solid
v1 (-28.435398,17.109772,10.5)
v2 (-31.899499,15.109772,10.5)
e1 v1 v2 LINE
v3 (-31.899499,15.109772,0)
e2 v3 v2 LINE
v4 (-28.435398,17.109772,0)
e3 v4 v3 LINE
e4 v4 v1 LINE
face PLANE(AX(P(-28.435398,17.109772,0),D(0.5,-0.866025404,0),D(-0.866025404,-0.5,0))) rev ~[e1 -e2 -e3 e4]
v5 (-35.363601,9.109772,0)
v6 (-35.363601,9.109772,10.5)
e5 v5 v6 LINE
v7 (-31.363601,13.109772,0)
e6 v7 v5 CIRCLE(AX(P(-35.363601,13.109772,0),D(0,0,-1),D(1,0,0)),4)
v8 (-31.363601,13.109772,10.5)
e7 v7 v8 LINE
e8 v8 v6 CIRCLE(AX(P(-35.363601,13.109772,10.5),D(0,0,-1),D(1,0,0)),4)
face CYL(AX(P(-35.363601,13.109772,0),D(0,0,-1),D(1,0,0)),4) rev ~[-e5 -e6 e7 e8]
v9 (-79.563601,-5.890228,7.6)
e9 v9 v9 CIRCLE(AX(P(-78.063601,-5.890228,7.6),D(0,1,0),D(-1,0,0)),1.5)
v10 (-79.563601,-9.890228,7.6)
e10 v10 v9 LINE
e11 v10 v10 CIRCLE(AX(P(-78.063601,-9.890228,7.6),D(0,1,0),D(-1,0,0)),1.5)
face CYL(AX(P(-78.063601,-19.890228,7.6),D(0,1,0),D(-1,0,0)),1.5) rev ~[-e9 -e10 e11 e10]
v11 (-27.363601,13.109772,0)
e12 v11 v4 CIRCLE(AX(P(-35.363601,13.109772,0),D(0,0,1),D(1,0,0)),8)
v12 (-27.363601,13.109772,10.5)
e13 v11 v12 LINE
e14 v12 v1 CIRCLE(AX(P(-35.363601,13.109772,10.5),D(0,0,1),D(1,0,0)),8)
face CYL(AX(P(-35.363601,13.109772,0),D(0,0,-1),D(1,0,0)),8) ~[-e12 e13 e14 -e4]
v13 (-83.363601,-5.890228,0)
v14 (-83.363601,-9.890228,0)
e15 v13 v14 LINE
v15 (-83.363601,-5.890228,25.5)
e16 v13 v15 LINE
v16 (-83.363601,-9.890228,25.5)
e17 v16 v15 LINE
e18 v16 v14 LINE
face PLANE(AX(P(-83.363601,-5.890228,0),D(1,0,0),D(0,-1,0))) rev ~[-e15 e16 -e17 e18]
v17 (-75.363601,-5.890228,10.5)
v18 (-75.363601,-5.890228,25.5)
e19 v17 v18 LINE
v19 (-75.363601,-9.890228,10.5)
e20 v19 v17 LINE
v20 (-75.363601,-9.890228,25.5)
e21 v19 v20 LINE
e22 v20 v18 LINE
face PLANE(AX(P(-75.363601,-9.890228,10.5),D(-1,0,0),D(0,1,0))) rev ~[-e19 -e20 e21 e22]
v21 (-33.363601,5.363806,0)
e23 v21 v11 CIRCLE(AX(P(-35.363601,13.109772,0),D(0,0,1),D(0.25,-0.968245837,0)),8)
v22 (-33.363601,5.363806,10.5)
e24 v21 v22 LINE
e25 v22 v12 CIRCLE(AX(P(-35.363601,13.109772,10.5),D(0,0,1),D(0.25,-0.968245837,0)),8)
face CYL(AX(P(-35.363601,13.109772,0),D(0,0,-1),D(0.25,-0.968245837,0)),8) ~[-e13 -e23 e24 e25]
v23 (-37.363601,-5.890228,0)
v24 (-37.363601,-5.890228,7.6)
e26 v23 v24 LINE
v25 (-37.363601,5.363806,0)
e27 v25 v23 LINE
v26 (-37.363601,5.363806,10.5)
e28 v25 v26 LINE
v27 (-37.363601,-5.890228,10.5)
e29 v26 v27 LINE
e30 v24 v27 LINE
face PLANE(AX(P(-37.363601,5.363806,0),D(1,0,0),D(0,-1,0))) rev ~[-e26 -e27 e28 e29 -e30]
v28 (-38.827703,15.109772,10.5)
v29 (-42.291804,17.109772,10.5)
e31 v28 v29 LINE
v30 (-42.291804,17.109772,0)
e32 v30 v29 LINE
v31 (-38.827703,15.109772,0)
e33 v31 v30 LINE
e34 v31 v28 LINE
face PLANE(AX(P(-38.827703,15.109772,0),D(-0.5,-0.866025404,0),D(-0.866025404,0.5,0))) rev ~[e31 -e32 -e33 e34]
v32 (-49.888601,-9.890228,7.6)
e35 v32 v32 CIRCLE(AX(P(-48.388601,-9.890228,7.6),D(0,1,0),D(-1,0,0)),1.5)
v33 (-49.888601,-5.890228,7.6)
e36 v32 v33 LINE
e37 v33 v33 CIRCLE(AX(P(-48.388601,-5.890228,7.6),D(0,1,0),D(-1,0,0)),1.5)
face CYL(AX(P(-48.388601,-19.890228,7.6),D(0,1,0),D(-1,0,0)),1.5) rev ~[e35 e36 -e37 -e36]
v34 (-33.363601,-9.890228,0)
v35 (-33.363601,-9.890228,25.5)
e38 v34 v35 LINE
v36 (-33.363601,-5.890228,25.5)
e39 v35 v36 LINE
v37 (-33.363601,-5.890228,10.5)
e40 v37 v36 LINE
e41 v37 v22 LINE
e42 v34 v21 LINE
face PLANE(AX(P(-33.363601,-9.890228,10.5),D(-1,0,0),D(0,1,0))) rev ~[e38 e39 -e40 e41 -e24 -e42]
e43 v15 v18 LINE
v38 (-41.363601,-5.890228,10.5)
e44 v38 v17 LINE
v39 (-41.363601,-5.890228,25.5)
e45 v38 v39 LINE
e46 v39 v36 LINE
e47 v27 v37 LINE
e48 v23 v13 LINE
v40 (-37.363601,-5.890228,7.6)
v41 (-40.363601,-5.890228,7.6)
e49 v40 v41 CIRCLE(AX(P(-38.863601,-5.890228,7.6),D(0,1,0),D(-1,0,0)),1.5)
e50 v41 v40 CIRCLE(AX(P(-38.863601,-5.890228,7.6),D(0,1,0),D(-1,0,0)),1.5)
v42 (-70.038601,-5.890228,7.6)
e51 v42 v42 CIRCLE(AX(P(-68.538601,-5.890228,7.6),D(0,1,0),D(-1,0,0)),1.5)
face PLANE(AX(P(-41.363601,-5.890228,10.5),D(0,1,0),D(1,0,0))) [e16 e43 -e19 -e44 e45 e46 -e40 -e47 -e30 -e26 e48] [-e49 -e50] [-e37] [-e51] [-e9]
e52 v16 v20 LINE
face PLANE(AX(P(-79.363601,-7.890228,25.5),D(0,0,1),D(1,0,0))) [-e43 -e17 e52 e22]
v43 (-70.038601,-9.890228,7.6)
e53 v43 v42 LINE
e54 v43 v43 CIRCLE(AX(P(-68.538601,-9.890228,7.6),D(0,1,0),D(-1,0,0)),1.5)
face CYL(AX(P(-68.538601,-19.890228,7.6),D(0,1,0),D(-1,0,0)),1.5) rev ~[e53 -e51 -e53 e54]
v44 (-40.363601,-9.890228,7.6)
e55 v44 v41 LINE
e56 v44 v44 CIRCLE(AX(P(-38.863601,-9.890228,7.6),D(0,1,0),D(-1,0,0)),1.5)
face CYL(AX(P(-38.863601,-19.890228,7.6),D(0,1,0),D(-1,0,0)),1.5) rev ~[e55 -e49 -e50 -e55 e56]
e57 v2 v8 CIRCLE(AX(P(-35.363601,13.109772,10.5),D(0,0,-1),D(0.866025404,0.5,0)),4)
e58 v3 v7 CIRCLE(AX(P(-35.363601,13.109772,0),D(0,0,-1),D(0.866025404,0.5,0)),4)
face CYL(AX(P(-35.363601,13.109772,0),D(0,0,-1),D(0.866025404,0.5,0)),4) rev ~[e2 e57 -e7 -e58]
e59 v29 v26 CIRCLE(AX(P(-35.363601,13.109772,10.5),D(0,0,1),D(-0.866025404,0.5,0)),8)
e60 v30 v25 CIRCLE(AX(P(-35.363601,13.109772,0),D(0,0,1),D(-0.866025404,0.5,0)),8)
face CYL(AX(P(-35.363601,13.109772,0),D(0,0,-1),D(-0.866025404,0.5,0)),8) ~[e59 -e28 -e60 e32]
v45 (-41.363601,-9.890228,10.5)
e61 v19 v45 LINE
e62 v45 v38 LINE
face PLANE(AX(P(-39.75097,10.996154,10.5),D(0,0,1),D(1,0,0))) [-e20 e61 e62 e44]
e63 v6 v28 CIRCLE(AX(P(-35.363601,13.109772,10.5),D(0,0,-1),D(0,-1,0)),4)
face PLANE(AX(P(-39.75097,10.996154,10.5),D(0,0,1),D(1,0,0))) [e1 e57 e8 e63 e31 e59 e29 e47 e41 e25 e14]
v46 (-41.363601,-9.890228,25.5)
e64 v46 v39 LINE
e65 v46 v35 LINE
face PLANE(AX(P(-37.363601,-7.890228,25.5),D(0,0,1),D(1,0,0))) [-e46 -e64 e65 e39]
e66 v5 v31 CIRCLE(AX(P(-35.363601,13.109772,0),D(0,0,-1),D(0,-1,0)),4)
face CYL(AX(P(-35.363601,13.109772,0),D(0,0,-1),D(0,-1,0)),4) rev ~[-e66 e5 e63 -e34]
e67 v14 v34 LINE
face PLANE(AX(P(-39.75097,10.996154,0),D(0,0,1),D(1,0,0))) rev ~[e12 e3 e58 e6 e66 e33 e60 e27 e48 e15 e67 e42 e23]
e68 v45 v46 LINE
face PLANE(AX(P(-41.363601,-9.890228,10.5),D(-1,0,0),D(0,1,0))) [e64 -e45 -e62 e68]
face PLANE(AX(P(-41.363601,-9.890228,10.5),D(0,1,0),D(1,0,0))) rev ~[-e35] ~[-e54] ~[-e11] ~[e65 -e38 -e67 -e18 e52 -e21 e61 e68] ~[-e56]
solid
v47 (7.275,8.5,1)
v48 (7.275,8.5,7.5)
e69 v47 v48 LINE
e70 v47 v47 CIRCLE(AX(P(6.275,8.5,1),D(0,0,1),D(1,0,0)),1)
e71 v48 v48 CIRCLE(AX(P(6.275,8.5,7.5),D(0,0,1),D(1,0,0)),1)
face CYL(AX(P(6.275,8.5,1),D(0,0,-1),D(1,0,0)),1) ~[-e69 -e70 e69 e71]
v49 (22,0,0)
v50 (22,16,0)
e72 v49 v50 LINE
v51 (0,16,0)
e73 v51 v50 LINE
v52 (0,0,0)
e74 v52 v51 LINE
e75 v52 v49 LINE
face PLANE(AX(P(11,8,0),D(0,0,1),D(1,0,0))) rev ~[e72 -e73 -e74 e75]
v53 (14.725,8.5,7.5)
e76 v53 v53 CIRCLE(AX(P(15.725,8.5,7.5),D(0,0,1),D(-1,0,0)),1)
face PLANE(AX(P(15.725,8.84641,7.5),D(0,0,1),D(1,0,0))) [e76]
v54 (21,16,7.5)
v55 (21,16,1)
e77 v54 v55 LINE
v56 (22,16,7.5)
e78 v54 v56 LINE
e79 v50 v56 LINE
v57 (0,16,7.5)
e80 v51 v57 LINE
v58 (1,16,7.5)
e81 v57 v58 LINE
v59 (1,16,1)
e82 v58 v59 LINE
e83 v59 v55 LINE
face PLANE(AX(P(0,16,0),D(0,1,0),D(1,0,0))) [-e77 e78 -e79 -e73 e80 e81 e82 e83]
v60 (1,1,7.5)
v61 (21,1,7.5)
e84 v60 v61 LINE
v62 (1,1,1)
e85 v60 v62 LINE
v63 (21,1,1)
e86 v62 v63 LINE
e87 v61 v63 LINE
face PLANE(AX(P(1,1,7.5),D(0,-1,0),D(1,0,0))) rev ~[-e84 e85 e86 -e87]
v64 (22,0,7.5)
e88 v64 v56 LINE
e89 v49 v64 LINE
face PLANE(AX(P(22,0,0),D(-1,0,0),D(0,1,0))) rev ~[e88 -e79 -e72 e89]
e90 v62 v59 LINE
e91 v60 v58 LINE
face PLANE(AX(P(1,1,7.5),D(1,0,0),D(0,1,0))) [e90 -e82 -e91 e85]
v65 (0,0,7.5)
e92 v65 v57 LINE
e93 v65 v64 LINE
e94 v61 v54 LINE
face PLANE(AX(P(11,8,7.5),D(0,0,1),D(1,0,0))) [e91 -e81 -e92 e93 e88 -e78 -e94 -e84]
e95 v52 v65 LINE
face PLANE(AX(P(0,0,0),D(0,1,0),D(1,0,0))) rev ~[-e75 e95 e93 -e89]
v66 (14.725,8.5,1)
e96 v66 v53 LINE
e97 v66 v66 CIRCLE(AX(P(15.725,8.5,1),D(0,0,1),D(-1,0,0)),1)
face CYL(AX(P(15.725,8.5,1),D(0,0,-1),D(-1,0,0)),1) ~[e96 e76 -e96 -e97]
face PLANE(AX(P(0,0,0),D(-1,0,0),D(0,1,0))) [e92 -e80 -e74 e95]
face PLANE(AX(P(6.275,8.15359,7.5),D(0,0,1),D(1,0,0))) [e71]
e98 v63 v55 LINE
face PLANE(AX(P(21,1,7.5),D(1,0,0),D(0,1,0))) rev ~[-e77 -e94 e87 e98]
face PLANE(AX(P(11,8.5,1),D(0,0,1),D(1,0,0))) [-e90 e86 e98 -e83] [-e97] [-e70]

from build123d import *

# Parameters (mm, degrees)
F0_W      = 22
F0_H      = 16
F1_DEPTH  = 7.5
F2_W      = 20
F2_H      = 15
F3_DEPTH  = 6.5
F5_DEPTH  = 6.5
F7_DEPTH  = 10.5
F9_W      = 8
F9_H      = 4
F10_DEPTH = 15
F12_D     = 3
F12_DEPTH = 10
F12_TIP   = 0.9012909285


# Not quite as in the source:
# - a feature names something its author has since deleted; it is built from what else it names


with BuildPart() as f1:
    # F0 (on Top) → F1 (new body)
    with BuildSketch(Plane.XY):
        with Locations((11, 8)):
            Rectangle(F0_W, F0_H)
    extrude(amount=F1_DEPTH)

    # F2 (on face) → F3 (cut)
    with BuildSketch(Plane.XY.offset(7.5)):
        with Locations((11, 8.5)):
            Rectangle(F2_W, F2_H)
    extrude(amount=-F3_DEPTH, mode=Mode.SUBTRACT)

    # F4 (on face) → F5 (join)
    with BuildSketch(Plane.XY.offset(1)):
        with BuildLine():
            ThreePointArc((5.275, 8.5), (6.275, 7.5), (7.275, 8.5))
            Line((7.275, 8.5), (5.275, 8.5))
        make_face()
        with BuildLine():
            Line((5.275, 8.5), (7.275, 8.5))
            ThreePointArc((7.275, 8.5), (6.275, 9.5), (5.275, 8.5))
        make_face()
        with BuildLine():
            ThreePointArc((16.725, 8.5), (15.725, 9.5), (14.725, 8.5))
            Line((14.725, 8.5), (16.725, 8.5))
        make_face()
        with BuildLine():
            Line((16.725, 8.5), (14.725, 8.5))
            ThreePointArc((14.725, 8.5), (15.725, 7.5), (16.725, 8.5))
        make_face()
    extrude(amount=F5_DEPTH)


with BuildPart() as f7:
    # F6 (on Top) → F7 (new body)
    with BuildSketch(Plane.XY):
        with BuildLine():
            Line((0.0722974215, 15.1097724214), (-3.3918041936, 17.1097724214))
            ThreePointArc((-3.3918041936, 17.1097724214), (-3.8406014795, 10.0146369826), (1.5363990366, 5.363805729))
            Line((1.5363990366, 5.363805729), (1.5363990366, 9.1097724214))
            Line((1.5363990366, 9.1097724214), (3.5363990366, 9.1097724214))
            ThreePointArc((3.5363990366, 9.1097724214), (0.0722974215, 11.1097724214), (0.0722974215, 15.1097724214))
        make_face()
        with BuildLine():
            ThreePointArc((3.5363990366, 5.1097724214), (4.5444333765, 5.1735348513), (5.5363990366, 5.363805729))
            Line((5.5363990366, 5.363805729), (5.5363990366, 9.1097724214))
            Line((5.5363990366, 9.1097724214), (3.5363990366, 9.1097724214))
            Line((3.5363990366, 9.1097724214), (3.5363990366, 5.1097724214))
        make_face()
        with BuildLine():
            ThreePointArc((1.5363990366, 5.363805729), (2.5283646968, 5.1735348513), (3.5363990366, 5.1097724214))
            Line((3.5363990366, 5.1097724214), (3.5363990366, 9.1097724214))
            Line((3.5363990366, 9.1097724214), (1.5363990366, 9.1097724214))
            Line((1.5363990366, 9.1097724214), (1.5363990366, 5.363805729))
        make_face()
        with BuildLine():
            ThreePointArc((5.5363990366, 5.363805729), (9.860954357, 8.2107929359), (11.5363990366, 13.1097724214))
            ThreePointArc((11.5363990366, 13.1097724214), (11.263805647, 15.1803247822), (10.4646022669, 17.1097724214))
            Line((10.4646022669, 17.1097724214), (7.0005006518, 15.1097724214))
            ThreePointArc((7.0005006518, 15.1097724214), (7.4001023418, 14.1450486018), (7.5363990366, 13.1097724214))
            ThreePointArc((7.5363990366, 13.1097724214), (6.3648261614, 10.2813452967), (3.5363990366, 9.1097724214))
            Line((3.5363990366, 9.1097724214), (5.5363990366, 9.1097724214))
            Line((5.5363990366, 9.1097724214), (5.5363990366, 5.363805729))
        make_face()
        with BuildLine():
            Line((5.5363990366, -5.8902275786), (5.5363990366, 5.363805729))
            ThreePointArc((5.5363990366, 5.363805729), (4.5444333765, 5.1735348513), (3.5363990366, 5.1097724214))
            Line((3.5363990366, 5.1097724214), (3.5363990366, -5.8902275786))
            Line((3.5363990366, -5.8902275786), (5.5363990366, -5.8902275786))
        make_face()
        with BuildLine():
            Line((3.5363990366, -5.8902275786), (3.5363990366, 5.1097724214))
            ThreePointArc((3.5363990366, 5.1097724214), (2.5283646968, 5.1735348513), (1.5363990366, 5.363805729))
            Line((1.5363990366, 5.363805729), (1.5363990366, -5.8902275786))
            Line((1.5363990366, -5.8902275786), (3.5363990366, -5.8902275786))
        make_face()
        Polygon((5.5363990366, -9.8902275786), (5.5363990366, -5.8902275786), (3.5363990366, -5.8902275786), (1.5363990366, -5.8902275786), (-44.4636009634, -5.8902275786), (-44.4636009634, -9.8902275786), align=None)
    extrude(amount=F7_DEPTH)


with BuildPart() as f7_1:
    # F8: moved
    add(f7.part.moved(Location((-38.9, 0, 0))))

    # F9 (on face) → F10 (join)
    with BuildSketch(Plane.XY.offset(10.5)):
        with Locations((-37.3636009634, -7.8902275786)):
            Rectangle(F9_W, F9_H)
        with Locations((-79.3636009634, -7.8902275786)):
            Rectangle(F9_W, F9_H)
    extrude(amount=F10_DEPTH)

    # F12
    with Locations(Plane.XZ.offset(9.8902275786)):
        with Locations((-78.0636009634, 7.6), (-68.5386009634, 7.6), (-48.3886009634, 7.6), (-38.8636009634, 7.6)):
            Hole(F12_D / 2, depth=F12_DEPTH)
            with Locations((0, 0, -(F12_DEPTH + F12_TIP / 2))):  # 118° drill point
                Cone(0, F12_D / 2, F12_TIP, mode=Mode.SUBTRACT)


solid = Compound([f1.part, f7_1.part])
